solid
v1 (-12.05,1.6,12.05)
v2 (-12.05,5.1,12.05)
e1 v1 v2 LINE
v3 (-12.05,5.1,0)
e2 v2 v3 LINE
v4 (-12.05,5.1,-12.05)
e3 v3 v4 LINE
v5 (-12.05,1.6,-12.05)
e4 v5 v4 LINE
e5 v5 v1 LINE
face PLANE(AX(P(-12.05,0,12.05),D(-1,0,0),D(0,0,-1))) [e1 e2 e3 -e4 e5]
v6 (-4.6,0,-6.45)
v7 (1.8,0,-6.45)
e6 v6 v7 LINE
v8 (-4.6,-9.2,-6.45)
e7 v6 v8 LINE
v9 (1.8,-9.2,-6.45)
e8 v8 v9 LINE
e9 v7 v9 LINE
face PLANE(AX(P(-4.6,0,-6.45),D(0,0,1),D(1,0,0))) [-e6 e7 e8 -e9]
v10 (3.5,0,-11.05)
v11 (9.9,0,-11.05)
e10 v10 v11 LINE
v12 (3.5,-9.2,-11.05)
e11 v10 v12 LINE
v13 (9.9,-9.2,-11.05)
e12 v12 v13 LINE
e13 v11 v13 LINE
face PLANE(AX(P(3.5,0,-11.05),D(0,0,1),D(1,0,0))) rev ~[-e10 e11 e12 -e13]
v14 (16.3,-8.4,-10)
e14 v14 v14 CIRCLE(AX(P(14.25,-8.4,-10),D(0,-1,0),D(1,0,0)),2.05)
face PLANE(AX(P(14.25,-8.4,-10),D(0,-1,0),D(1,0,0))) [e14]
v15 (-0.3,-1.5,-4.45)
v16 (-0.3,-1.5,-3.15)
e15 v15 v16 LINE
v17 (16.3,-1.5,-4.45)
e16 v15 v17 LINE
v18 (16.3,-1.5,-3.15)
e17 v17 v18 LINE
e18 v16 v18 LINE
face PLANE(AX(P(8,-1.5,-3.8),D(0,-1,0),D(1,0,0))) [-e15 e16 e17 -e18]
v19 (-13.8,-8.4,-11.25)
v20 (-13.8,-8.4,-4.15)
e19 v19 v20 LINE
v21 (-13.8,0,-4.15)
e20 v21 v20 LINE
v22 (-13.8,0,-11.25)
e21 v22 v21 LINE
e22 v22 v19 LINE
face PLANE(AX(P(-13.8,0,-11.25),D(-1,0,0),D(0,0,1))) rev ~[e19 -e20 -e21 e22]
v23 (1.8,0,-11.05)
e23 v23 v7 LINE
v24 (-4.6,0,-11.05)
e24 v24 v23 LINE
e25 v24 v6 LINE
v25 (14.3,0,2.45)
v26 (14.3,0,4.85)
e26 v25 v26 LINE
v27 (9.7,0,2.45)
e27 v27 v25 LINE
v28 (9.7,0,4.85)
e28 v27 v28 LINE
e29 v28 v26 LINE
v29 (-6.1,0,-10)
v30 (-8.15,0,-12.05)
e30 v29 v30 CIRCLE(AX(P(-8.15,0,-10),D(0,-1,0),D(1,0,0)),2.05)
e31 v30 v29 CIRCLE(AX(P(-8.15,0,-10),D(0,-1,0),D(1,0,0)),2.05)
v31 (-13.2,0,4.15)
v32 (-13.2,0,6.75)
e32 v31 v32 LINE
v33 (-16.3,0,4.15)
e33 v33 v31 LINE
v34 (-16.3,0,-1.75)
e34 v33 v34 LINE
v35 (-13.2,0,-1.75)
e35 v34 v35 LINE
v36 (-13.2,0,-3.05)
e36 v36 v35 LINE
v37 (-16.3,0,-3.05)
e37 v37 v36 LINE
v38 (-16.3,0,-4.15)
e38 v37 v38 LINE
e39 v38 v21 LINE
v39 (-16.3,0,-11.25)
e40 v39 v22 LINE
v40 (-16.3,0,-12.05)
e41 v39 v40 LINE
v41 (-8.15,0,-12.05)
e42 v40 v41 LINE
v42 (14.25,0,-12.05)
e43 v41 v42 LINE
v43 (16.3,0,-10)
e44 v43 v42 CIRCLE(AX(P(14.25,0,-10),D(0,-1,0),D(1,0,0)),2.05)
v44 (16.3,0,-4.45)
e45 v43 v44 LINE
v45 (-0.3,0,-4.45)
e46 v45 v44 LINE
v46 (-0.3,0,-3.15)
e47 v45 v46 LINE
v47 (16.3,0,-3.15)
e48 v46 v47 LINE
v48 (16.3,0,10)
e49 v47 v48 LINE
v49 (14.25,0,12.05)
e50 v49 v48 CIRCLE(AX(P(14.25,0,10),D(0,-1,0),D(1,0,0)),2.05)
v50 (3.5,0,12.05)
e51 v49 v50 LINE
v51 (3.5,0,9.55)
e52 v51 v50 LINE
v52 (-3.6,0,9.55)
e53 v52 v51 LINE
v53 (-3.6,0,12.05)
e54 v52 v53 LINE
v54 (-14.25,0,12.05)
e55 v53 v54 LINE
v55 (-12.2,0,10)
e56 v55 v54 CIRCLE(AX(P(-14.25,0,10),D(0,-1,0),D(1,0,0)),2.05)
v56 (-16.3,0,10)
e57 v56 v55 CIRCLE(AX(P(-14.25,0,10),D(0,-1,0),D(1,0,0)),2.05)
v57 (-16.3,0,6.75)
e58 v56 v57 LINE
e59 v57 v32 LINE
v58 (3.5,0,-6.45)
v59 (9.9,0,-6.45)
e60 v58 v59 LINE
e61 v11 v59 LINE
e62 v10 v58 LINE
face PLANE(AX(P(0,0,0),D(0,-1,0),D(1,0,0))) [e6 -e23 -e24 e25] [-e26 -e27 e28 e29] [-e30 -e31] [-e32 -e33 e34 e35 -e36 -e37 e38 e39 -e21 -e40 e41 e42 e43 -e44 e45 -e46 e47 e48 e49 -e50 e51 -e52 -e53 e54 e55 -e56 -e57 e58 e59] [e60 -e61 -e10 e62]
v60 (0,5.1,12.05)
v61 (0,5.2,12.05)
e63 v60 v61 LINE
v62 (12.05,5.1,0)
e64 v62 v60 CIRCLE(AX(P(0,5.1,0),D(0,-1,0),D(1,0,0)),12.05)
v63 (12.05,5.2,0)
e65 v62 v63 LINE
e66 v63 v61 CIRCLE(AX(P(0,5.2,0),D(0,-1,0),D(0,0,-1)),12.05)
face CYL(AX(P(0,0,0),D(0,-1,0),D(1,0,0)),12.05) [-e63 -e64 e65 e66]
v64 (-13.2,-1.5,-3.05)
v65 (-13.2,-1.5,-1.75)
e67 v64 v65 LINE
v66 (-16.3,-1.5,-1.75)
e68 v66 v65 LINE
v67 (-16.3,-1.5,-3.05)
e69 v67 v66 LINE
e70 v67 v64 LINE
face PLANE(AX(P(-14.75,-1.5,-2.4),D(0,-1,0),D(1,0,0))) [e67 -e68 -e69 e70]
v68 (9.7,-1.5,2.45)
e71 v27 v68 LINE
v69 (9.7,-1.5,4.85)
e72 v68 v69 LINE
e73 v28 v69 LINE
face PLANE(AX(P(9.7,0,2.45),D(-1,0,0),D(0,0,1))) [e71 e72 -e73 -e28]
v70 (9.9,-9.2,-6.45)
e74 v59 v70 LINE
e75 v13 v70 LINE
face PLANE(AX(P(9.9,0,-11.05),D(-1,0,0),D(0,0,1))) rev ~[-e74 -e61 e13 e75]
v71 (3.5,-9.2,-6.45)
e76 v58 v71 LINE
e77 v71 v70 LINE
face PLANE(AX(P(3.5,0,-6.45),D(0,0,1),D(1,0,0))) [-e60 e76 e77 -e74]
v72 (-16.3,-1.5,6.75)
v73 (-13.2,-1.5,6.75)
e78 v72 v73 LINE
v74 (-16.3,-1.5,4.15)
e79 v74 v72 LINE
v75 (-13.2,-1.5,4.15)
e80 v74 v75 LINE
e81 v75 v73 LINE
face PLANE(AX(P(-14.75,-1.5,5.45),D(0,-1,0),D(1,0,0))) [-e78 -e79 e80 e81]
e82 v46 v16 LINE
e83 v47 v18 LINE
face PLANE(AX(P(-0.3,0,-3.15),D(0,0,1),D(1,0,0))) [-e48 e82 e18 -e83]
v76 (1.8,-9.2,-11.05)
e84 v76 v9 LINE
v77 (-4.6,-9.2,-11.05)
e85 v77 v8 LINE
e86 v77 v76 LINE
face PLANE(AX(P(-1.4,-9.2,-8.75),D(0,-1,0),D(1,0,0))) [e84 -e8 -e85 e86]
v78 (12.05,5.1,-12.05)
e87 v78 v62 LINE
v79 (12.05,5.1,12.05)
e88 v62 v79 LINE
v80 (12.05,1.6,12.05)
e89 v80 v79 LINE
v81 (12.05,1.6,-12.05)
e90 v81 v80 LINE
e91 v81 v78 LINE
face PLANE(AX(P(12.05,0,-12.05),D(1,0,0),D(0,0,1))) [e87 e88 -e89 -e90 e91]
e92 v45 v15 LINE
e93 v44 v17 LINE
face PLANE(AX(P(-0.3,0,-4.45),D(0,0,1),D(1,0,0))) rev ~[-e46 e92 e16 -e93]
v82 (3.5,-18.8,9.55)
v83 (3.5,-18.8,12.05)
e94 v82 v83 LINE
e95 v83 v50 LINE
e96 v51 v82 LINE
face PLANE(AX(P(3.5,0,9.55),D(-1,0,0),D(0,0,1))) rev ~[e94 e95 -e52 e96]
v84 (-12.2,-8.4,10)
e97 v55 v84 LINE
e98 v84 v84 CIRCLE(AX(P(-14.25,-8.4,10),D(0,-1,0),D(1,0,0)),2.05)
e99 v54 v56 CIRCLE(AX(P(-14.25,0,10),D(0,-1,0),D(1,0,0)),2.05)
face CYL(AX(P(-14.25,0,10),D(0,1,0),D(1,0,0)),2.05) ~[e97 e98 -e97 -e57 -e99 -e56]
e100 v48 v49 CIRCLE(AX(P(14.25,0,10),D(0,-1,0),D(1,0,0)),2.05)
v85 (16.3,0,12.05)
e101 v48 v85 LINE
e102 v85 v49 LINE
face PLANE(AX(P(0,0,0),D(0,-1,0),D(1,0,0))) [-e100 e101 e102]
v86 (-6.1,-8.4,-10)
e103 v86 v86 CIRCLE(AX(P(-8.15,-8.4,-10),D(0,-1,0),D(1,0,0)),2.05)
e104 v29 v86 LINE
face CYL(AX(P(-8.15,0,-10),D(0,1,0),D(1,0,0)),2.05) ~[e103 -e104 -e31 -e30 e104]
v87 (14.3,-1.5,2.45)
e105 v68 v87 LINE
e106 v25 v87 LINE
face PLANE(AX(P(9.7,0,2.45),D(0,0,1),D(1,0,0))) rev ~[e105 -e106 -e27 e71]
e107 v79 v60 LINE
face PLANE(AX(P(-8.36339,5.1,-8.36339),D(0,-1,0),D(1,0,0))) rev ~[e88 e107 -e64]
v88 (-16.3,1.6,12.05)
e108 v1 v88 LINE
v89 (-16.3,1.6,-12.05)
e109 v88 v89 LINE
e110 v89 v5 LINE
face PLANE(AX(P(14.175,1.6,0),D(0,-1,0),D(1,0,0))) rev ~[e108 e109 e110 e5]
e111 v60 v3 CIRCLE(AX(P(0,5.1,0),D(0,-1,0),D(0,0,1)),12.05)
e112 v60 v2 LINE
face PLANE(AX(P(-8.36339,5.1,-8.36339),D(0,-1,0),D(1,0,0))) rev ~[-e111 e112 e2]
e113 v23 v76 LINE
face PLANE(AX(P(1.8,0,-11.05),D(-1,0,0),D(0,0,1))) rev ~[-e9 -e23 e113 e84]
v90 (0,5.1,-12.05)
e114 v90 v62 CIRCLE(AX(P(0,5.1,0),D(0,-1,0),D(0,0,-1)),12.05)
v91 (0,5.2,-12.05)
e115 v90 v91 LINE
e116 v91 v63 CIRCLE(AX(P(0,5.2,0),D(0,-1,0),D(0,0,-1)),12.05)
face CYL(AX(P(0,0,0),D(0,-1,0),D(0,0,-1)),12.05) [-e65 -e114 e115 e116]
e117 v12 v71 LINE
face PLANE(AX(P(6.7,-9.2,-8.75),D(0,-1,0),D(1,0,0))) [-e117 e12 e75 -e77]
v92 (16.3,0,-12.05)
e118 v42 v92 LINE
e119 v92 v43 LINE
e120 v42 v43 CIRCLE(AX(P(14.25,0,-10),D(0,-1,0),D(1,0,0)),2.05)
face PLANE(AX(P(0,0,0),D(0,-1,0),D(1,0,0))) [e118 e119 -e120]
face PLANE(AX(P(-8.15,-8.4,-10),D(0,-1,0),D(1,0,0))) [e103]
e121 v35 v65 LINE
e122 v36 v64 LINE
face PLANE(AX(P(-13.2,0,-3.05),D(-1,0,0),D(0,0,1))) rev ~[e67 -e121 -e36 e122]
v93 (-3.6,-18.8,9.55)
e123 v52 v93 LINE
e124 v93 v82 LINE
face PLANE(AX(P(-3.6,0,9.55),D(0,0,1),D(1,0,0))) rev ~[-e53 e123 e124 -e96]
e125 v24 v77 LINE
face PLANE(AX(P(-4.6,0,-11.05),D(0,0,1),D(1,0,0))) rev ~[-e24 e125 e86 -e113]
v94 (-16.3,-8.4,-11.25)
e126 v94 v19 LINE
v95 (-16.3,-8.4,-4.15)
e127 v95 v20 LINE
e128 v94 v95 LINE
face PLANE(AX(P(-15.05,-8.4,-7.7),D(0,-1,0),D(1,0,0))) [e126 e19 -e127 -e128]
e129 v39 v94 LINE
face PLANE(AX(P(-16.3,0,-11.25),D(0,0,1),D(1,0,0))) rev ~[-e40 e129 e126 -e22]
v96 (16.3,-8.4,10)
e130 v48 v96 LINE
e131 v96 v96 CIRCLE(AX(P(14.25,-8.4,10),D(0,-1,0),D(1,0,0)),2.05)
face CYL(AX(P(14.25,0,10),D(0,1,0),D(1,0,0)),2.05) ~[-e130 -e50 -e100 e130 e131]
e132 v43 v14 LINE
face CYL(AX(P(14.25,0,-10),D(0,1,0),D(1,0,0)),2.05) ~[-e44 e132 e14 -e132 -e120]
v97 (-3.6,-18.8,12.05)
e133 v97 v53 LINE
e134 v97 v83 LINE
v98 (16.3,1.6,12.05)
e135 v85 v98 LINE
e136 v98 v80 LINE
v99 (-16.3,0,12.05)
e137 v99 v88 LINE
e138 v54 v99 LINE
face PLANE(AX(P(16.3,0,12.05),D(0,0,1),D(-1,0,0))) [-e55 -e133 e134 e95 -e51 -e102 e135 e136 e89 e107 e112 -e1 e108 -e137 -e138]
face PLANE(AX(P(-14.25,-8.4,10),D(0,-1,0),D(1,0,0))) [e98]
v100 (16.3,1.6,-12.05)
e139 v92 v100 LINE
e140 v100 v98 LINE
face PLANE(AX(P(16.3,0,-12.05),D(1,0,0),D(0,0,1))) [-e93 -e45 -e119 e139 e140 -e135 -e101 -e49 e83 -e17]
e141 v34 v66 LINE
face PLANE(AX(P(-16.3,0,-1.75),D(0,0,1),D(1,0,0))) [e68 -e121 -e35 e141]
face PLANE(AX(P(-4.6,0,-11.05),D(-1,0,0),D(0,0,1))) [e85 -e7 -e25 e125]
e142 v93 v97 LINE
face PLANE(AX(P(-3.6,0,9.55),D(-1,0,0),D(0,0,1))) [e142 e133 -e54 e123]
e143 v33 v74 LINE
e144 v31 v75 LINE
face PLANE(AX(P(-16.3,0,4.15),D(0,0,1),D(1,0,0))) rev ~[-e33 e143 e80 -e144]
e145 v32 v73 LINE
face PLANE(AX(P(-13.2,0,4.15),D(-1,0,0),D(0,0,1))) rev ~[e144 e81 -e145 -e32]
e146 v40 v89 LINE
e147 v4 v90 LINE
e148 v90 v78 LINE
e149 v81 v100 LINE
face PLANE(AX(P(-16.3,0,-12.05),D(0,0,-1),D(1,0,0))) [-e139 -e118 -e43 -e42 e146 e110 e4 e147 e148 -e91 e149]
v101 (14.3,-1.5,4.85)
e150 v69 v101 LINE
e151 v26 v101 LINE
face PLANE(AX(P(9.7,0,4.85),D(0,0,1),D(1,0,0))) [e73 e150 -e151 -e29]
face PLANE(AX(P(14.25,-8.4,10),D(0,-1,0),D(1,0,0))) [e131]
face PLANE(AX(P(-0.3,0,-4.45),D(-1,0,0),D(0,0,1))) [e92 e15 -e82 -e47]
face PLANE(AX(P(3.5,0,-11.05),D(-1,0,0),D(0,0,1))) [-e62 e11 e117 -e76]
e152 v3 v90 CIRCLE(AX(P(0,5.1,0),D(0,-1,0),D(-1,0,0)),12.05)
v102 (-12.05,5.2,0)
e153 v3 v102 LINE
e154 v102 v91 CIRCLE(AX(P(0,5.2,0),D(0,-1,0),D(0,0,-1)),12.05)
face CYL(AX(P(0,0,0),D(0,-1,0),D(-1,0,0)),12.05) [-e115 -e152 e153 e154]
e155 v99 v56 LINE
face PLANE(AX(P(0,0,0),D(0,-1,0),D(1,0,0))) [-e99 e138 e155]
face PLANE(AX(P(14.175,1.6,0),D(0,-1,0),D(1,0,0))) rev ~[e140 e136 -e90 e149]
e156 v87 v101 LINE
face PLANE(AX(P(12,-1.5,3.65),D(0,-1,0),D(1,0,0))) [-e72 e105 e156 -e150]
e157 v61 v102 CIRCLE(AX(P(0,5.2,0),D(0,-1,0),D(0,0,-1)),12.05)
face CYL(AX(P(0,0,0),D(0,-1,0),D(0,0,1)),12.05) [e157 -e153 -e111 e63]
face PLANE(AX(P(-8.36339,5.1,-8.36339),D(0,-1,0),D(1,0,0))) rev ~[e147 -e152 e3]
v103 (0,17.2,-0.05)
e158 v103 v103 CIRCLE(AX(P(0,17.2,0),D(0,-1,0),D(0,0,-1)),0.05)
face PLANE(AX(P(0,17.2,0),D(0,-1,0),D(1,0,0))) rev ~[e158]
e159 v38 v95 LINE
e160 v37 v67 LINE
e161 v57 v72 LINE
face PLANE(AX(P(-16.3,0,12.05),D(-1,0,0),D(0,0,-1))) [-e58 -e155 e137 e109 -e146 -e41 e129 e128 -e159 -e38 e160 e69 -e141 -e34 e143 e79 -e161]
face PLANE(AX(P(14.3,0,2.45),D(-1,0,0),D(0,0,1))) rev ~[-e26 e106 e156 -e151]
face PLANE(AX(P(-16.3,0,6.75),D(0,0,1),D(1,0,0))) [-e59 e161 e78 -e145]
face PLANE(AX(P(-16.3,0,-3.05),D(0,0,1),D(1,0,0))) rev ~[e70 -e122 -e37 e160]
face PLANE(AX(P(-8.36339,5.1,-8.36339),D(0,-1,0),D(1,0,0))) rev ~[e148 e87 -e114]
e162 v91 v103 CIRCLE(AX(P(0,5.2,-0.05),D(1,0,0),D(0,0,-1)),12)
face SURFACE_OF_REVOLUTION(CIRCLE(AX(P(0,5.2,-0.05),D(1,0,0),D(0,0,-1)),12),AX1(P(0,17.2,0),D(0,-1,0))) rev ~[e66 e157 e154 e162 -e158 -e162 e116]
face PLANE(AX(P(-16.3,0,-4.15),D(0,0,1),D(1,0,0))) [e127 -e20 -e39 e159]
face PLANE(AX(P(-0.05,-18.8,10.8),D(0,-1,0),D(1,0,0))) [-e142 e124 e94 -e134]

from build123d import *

# Parameters (mm, degrees)
F2_DEPTH = 1.6
F3_DEPTH = 5.1
F4_DEPTH = 17.2
F1_R     = 2.05
F1_W     = 2.5
F1_H     = 7.1
F1_W_2   = 7.1
F1_H_2   = 2.5
F6_DEPTH = 8.4
F1_W_3   = 6.4
F1_H_3   = 4.6
F7_DEPTH = 9.2
F8_DEPTH = 18.8
F1_W_4   = 3.1
F1_H_4   = 1.3
F1_W_5   = 4.6
F1_H_5   = 2.4
F1_W_6   = 16.6
F1_H_6   = 2.6
F9_DEPTH = 1.5


# Not quite as in the source:
# - a fillet or chamfer that OpenCascade refuses, or shapes differently, is made with other operations: its cross-section is extruded or revolved along the edge and cut away or added


with BuildPart() as f2:
    # F0 (on Front) → F2 (new body)
    with BuildSketch(Plane.XZ):
        Polygon((16.3, -12.05), (16.3, 12.05), (12.05, 12.05), (12.05, 0), (12.05, -12.05), align=None)
        with BuildLine():
            Line((12.05, 0), (12.05, 12.05))
            Line((12.05, 12.05), (0, 12.05))
            ThreePointArc((0, 12.05), (8.5206367133, 8.5206367133), (12.05, 0))
        make_face()
        with BuildLine():
            ThreePointArc((-12.05, 0), (-8.5206367133, 8.5206367133), (0, 12.05))
            Line((0, 12.05), (-12.05, 12.05))
            Line((-12.05, 12.05), (-12.05, 0))
        make_face()
        with BuildLine():
            ThreePointArc((12.05, 0), (8.5206367133, 8.5206367133), (0, 12.05))
            ThreePointArc((0, 12.05), (-8.5206367133, 8.5206367133), (-12.05, 0))
            ThreePointArc((-12.05, 0), (-8.5206367125, -8.5206367141), (2.1e-09, -12.05))
            ThreePointArc((2.1e-09, -12.05), (8.5206367141, -8.5206367125), (12.05, 0))
        make_face()
        with BuildLine():
            Line((12.05, -12.05), (12.05, 0))
            ThreePointArc((12.05, 0), (8.5206367141, -8.5206367125), (2.1e-09, -12.05))
            Line((2.1e-09, -12.05), (12.05, -12.05))
        make_face()
        Polygon((-12.05, 0), (-12.05, 12.05), (-16.3, 12.05), (-16.3, -12.05), (-12.05, -12.05), align=None)
        with BuildLine():
            ThreePointArc((2.1e-09, -12.05), (-8.5206367125, -8.5206367141), (-12.05, 0))
            Line((-12.05, 0), (-12.05, -12.05))
            Line((-12.05, -12.05), (2.1e-09, -12.05))
        make_face()
    extrude(amount=-F2_DEPTH)

    # F0 (on Front) → F3 (join)
    with BuildSketch(Plane.XZ):
        with BuildLine():
            ThreePointArc((2.1e-09, -12.05), (-8.5206367125, -8.5206367141), (-12.05, 0))
            Line((-12.05, 0), (-12.05, -12.05))
            Line((-12.05, -12.05), (2.1e-09, -12.05))
        make_face()
        with BuildLine():
            ThreePointArc((-12.05, 0), (-8.5206367133, 8.5206367133), (0, 12.05))
            Line((0, 12.05), (-12.05, 12.05))
            Line((-12.05, 12.05), (-12.05, 0))
        make_face()
        with BuildLine():
            ThreePointArc((12.05, 0), (8.5206367133, 8.5206367133), (0, 12.05))
            ThreePointArc((0, 12.05), (-8.5206367133, 8.5206367133), (-12.05, 0))
            ThreePointArc((-12.05, 0), (-8.5206367125, -8.5206367141), (2.1e-09, -12.05))
            ThreePointArc((2.1e-09, -12.05), (8.5206367141, -8.5206367125), (12.05, 0))
        make_face()
        with BuildLine():
            Line((12.05, 0), (12.05, 12.05))
            Line((12.05, 12.05), (0, 12.05))
            ThreePointArc((0, 12.05), (8.5206367133, 8.5206367133), (12.05, 0))
        make_face()
        with BuildLine():
            Line((12.05, -12.05), (12.05, 0))
            ThreePointArc((12.05, 0), (8.5206367141, -8.5206367125), (2.1e-09, -12.05))
            Line((2.1e-09, -12.05), (12.05, -12.05))
        make_face()
    extrude(amount=-F3_DEPTH)

    # F0 (on Front) → F4 (join)
    with BuildSketch(Plane.XZ):
        with BuildLine():
            ThreePointArc((12.05, 0), (8.5206367133, 8.5206367133), (0, 12.05))
            ThreePointArc((0, 12.05), (-8.5206367133, 8.5206367133), (-12.05, 0))
            ThreePointArc((-12.05, 0), (-8.5206367125, -8.5206367141), (2.1e-09, -12.05))
            ThreePointArc((2.1e-09, -12.05), (8.5206367141, -8.5206367125), (12.05, 0))
        make_face()
    extrude(amount=-F4_DEPTH)

    # F5: fillet of radius 12 on 1 edges, made by hand

    # F5_s1 → F5_t2 (revolve, cut)
    with BuildSketch(Plane.YZ):
        with BuildLine():
            ThreePointArc((5.2, -12.05), (13.6852813742, -8.5352813742), (17.2, -0.05))
            Line((17.2, -0.05), (17.2, -12.05))
            Line((17.2, -12.05), (5.2, -12.05))
        make_face()
    revolve(axis=Axis((0, 17.2, 0), (0, -1, 0)), mode=Mode.SUBTRACT)

    # F1 (on Front) → F6 (join)
    with BuildSketch(Plane.XZ):
        with Locations((-14.25, 10)):
            Circle(F1_R)
        with Locations((14.25, 10)):
            Circle(F1_R)
        with Locations((14.25, -10)):
            Circle(F1_R)
        with Locations((-8.15, -10)):
            Circle(F1_R)
        with Locations((-15.05, -7.7)):
            Rectangle(F1_W, F1_H)
        with Locations((-0.05, 10.8)):
            Rectangle(F1_W_2, F1_H_2)
    extrude(amount=F6_DEPTH)

    # F1 (on Front) → F7 (join)
    with BuildSketch(Plane.XZ):
        with Locations((-1.4, -8.75)):
            Rectangle(F1_W_3, F1_H_3)
        with Locations((6.7, -8.75)):
            Rectangle(F1_W_3, F1_H_3)
    extrude(amount=F7_DEPTH)

    # F1 (on Front) → F8 (join)
    with BuildSketch(Plane.XZ):
        with Locations((-0.05, 10.8)):
            Rectangle(F1_W_2, F1_H_2)
    extrude(amount=F8_DEPTH)

    # F1 (on Front) → F9 (join)
    with BuildSketch(Plane.XZ):
        with Locations((-14.75, -2.4)):
            Rectangle(F1_W_4, F1_H_4)
        with Locations((12, 3.65)):
            Rectangle(F1_W_5, F1_H_5)
        with Locations((8, -3.8)):
            Rectangle(F1_W_6, F1_H_4)
        with Locations((-14.75, 5.45)):
            Rectangle(F1_W_4, F1_H_6)
    extrude(amount=F9_DEPTH)


solid = f2.part
